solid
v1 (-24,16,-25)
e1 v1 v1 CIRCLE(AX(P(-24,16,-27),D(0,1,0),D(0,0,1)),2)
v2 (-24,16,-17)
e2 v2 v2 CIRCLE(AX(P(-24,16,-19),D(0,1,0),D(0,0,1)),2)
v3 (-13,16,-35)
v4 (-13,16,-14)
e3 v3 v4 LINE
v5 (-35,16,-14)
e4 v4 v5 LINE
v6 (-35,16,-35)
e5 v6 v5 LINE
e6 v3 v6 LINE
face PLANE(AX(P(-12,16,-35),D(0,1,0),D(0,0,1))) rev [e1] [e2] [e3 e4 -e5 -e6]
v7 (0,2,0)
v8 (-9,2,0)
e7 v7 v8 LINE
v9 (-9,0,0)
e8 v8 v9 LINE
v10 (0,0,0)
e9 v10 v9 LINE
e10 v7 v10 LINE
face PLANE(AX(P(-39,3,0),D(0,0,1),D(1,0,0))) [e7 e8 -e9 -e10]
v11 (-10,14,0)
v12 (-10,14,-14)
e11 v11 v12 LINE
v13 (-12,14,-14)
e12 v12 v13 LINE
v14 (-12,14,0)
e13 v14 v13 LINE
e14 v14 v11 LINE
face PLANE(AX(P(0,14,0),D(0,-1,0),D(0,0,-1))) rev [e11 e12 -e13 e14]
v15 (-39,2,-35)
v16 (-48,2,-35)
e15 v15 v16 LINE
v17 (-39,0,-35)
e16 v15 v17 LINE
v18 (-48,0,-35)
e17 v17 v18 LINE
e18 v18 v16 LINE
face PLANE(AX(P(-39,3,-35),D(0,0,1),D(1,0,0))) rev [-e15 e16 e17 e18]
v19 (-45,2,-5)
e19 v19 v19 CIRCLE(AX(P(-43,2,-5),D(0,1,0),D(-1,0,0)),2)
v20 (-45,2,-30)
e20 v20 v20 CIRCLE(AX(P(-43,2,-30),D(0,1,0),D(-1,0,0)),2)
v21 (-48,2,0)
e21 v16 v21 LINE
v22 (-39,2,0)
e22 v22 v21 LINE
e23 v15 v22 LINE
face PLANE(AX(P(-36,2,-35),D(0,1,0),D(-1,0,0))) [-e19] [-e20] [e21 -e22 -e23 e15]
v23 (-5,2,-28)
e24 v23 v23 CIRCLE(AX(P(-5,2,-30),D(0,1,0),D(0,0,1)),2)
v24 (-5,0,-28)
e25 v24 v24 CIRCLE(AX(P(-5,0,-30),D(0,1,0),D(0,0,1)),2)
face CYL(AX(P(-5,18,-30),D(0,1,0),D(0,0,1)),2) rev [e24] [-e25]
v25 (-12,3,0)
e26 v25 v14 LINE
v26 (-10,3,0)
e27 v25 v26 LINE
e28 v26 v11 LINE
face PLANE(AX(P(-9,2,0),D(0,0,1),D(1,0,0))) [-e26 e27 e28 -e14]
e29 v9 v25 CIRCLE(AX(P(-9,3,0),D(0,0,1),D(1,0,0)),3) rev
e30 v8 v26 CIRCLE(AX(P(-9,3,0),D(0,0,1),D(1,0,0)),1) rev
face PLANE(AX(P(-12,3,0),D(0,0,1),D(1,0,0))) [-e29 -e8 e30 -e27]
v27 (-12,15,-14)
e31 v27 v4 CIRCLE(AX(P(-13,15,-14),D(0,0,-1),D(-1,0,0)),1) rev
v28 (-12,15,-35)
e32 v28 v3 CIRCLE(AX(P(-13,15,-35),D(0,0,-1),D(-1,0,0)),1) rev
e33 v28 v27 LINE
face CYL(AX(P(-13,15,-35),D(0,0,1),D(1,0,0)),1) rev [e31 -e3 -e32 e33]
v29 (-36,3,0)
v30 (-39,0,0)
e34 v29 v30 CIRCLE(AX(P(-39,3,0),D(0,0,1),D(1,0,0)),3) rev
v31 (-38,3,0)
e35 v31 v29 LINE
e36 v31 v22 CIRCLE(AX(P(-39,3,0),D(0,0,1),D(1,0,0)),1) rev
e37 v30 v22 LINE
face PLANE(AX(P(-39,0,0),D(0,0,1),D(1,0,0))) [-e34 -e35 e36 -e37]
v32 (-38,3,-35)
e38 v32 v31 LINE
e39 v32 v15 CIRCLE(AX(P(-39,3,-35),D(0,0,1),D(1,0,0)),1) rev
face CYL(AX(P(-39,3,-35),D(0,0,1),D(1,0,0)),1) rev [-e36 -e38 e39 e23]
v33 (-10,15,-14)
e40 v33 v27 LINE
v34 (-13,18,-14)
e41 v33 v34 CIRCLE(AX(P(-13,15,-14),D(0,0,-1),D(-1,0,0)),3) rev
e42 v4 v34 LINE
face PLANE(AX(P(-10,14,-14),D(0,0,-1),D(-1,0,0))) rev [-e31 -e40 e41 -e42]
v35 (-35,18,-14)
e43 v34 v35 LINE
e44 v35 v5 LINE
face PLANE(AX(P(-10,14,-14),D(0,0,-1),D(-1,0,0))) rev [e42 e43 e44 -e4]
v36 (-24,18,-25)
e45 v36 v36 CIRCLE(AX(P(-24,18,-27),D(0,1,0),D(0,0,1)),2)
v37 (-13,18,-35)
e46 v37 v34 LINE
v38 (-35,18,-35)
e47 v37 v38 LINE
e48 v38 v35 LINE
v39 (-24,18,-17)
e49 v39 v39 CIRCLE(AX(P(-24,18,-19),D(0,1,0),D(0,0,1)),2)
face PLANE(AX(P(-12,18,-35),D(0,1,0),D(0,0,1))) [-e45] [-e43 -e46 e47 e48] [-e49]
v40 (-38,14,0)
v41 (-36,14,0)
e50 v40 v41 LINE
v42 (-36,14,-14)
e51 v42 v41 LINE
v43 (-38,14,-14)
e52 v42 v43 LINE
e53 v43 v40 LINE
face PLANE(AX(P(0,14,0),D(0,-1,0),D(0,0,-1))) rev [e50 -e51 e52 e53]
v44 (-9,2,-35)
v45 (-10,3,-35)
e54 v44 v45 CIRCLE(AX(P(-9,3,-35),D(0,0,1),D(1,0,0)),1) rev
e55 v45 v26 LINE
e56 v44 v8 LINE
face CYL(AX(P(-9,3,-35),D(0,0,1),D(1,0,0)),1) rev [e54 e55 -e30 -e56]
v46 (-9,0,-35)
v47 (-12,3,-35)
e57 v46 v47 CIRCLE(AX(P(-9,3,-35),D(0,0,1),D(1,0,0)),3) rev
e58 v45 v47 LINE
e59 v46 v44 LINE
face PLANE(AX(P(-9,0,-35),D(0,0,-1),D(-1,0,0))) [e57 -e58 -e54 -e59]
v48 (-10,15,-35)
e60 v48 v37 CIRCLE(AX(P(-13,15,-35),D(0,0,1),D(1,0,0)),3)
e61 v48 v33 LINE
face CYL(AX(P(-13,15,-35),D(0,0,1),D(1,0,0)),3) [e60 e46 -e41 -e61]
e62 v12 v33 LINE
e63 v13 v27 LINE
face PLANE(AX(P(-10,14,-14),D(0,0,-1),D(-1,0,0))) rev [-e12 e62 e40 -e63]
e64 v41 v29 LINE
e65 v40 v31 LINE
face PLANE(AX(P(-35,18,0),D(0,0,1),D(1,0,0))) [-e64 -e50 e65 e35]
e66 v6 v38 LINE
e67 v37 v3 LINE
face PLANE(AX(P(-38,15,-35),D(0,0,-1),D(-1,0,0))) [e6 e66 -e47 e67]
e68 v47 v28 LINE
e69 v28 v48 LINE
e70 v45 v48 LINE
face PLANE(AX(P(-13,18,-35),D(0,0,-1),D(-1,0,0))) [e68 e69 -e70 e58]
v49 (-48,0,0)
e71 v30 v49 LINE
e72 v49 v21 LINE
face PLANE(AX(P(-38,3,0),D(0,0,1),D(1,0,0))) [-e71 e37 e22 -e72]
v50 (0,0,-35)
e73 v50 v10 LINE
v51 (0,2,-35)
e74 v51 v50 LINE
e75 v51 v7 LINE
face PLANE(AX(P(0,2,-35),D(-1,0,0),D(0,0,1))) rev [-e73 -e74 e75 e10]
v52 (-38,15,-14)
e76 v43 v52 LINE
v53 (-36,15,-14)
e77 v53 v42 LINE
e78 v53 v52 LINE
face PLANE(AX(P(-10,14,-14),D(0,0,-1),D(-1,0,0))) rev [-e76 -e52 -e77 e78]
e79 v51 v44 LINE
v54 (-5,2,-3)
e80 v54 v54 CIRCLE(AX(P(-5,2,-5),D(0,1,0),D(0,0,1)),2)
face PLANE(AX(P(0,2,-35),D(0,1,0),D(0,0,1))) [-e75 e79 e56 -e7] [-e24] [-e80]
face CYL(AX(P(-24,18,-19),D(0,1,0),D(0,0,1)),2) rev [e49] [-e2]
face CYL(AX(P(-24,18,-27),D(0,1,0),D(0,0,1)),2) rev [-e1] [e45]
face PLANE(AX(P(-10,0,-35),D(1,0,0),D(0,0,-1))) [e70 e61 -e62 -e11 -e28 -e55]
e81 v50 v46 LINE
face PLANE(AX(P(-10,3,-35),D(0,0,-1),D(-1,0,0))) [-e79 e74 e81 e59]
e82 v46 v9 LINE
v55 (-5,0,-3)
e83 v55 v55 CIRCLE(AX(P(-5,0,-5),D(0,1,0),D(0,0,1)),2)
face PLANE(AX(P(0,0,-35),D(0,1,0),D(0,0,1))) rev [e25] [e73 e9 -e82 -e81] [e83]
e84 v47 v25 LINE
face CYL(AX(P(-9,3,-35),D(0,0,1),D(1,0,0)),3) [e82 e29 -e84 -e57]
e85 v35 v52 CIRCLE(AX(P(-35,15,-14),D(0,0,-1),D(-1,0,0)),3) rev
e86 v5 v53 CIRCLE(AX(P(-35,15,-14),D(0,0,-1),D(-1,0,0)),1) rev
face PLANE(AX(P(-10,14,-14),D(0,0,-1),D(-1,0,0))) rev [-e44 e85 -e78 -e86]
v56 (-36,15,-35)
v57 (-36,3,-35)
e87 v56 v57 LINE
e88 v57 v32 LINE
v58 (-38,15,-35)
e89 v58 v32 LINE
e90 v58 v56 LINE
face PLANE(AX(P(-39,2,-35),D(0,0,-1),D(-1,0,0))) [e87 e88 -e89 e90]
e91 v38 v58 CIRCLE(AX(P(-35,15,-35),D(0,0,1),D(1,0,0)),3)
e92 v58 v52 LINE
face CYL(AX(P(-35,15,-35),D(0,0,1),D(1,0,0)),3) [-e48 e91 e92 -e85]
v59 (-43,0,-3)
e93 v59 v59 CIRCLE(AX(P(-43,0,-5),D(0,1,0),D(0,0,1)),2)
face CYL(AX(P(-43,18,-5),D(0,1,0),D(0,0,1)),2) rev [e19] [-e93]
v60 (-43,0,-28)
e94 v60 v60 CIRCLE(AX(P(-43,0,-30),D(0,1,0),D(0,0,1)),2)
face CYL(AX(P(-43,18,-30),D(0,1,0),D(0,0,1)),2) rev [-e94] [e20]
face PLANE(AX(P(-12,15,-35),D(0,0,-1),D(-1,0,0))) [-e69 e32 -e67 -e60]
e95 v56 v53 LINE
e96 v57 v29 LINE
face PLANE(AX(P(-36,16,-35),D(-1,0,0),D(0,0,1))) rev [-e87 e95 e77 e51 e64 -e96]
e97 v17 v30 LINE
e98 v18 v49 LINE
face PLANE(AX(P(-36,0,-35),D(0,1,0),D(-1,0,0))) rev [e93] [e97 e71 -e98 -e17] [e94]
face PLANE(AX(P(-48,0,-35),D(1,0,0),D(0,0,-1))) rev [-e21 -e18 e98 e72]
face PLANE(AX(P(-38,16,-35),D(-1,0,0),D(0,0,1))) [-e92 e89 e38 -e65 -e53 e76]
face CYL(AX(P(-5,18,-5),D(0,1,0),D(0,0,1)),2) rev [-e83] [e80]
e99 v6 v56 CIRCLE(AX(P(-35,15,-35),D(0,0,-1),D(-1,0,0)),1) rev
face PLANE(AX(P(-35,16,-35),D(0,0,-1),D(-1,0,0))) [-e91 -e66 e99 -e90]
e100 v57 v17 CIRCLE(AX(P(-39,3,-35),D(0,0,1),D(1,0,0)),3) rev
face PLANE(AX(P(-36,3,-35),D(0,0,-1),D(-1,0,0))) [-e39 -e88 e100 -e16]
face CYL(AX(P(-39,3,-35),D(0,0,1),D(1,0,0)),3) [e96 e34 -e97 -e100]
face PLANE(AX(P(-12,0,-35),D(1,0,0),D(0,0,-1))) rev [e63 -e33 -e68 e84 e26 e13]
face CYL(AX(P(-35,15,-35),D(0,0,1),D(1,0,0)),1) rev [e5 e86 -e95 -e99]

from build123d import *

# Parameters (mm, degrees)
BASE_FLANGE1_DEPTH       = 35
SKETCH6_W                = 28
SKETCH6_H                = 14
CUT_EXTRUDE1_DEPTH       = 4
F_4_0_4_DIAMETER_HOLE1_D = 4


# Sheet-metal steps are written as plain solids
with BuildPart() as part:
    # Sketch1 → Base-Flange1 (new body)
    with BuildSketch(Plane.XY):
        with BuildLine():
            Line((0, 0), (-9, 0))
            ThreePointArc((-9, 0), (-11.121320344, 0.878679656), (-12, 3))
            Line((-12, 3), (-12, 15))
            ThreePointArc((-12, 15), (-12.292893219, 15.707106781), (-13, 16))
            Line((-13, 16), (-35, 16))
            ThreePointArc((-35, 16), (-35.707106781, 15.707106781), (-36, 15))
            Line((-36, 15), (-36, 3))
            ThreePointArc((-36, 3), (-36.878679656, 0.878679656), (-39, 0))
            Line((-39, 0), (-48, 0))
            Line((-48, 0), (-48, 2))
            Line((-48, 2), (-39, 2))
            ThreePointArc((-39, 2), (-38.292893219, 2.292893219), (-38, 3))
            Line((-38, 3), (-38, 15))
            ThreePointArc((-38, 15), (-37.121320344, 17.121320344), (-35, 18))
            Line((-35, 18), (-13, 18))
            ThreePointArc((-13, 18), (-10.878679656, 17.121320344), (-10, 15))
            Line((-10, 15), (-10, 3))
            ThreePointArc((-10, 3), (-9.707106781, 2.292893219), (-9, 2))
            Line((-9, 2), (0, 2))
            Line((0, 2), (0, 0))
        make_face()
    extrude(amount=-BASE_FLANGE1_DEPTH)

    # Sketch6 → Cut-Extrude1 (cut)
    with BuildSketch(Plane(origin=(0, 18, 0), x_dir=(1, 0, 0), z_dir=(0, 1, 0))):
        with Locations((-24, 7)):
            Rectangle(SKETCH6_W, SKETCH6_H)
    extrude(amount=-CUT_EXTRUDE1_DEPTH, mode=Mode.SUBTRACT)

    # Ø4.0 (4) Diameter Hole1 (through all)
    with Locations(Plane(origin=(0, 18, 0), x_dir=(1, 0, 0), z_dir=(0, 1, 0))):
        with Locations((-5, 5), (-5, 30), (-24, 19), (-24, 27), (-43, 5), (-43, 30)):
            Hole(F_4_0_4_DIAMETER_HOLE1_D / 2)


solid = part.part
